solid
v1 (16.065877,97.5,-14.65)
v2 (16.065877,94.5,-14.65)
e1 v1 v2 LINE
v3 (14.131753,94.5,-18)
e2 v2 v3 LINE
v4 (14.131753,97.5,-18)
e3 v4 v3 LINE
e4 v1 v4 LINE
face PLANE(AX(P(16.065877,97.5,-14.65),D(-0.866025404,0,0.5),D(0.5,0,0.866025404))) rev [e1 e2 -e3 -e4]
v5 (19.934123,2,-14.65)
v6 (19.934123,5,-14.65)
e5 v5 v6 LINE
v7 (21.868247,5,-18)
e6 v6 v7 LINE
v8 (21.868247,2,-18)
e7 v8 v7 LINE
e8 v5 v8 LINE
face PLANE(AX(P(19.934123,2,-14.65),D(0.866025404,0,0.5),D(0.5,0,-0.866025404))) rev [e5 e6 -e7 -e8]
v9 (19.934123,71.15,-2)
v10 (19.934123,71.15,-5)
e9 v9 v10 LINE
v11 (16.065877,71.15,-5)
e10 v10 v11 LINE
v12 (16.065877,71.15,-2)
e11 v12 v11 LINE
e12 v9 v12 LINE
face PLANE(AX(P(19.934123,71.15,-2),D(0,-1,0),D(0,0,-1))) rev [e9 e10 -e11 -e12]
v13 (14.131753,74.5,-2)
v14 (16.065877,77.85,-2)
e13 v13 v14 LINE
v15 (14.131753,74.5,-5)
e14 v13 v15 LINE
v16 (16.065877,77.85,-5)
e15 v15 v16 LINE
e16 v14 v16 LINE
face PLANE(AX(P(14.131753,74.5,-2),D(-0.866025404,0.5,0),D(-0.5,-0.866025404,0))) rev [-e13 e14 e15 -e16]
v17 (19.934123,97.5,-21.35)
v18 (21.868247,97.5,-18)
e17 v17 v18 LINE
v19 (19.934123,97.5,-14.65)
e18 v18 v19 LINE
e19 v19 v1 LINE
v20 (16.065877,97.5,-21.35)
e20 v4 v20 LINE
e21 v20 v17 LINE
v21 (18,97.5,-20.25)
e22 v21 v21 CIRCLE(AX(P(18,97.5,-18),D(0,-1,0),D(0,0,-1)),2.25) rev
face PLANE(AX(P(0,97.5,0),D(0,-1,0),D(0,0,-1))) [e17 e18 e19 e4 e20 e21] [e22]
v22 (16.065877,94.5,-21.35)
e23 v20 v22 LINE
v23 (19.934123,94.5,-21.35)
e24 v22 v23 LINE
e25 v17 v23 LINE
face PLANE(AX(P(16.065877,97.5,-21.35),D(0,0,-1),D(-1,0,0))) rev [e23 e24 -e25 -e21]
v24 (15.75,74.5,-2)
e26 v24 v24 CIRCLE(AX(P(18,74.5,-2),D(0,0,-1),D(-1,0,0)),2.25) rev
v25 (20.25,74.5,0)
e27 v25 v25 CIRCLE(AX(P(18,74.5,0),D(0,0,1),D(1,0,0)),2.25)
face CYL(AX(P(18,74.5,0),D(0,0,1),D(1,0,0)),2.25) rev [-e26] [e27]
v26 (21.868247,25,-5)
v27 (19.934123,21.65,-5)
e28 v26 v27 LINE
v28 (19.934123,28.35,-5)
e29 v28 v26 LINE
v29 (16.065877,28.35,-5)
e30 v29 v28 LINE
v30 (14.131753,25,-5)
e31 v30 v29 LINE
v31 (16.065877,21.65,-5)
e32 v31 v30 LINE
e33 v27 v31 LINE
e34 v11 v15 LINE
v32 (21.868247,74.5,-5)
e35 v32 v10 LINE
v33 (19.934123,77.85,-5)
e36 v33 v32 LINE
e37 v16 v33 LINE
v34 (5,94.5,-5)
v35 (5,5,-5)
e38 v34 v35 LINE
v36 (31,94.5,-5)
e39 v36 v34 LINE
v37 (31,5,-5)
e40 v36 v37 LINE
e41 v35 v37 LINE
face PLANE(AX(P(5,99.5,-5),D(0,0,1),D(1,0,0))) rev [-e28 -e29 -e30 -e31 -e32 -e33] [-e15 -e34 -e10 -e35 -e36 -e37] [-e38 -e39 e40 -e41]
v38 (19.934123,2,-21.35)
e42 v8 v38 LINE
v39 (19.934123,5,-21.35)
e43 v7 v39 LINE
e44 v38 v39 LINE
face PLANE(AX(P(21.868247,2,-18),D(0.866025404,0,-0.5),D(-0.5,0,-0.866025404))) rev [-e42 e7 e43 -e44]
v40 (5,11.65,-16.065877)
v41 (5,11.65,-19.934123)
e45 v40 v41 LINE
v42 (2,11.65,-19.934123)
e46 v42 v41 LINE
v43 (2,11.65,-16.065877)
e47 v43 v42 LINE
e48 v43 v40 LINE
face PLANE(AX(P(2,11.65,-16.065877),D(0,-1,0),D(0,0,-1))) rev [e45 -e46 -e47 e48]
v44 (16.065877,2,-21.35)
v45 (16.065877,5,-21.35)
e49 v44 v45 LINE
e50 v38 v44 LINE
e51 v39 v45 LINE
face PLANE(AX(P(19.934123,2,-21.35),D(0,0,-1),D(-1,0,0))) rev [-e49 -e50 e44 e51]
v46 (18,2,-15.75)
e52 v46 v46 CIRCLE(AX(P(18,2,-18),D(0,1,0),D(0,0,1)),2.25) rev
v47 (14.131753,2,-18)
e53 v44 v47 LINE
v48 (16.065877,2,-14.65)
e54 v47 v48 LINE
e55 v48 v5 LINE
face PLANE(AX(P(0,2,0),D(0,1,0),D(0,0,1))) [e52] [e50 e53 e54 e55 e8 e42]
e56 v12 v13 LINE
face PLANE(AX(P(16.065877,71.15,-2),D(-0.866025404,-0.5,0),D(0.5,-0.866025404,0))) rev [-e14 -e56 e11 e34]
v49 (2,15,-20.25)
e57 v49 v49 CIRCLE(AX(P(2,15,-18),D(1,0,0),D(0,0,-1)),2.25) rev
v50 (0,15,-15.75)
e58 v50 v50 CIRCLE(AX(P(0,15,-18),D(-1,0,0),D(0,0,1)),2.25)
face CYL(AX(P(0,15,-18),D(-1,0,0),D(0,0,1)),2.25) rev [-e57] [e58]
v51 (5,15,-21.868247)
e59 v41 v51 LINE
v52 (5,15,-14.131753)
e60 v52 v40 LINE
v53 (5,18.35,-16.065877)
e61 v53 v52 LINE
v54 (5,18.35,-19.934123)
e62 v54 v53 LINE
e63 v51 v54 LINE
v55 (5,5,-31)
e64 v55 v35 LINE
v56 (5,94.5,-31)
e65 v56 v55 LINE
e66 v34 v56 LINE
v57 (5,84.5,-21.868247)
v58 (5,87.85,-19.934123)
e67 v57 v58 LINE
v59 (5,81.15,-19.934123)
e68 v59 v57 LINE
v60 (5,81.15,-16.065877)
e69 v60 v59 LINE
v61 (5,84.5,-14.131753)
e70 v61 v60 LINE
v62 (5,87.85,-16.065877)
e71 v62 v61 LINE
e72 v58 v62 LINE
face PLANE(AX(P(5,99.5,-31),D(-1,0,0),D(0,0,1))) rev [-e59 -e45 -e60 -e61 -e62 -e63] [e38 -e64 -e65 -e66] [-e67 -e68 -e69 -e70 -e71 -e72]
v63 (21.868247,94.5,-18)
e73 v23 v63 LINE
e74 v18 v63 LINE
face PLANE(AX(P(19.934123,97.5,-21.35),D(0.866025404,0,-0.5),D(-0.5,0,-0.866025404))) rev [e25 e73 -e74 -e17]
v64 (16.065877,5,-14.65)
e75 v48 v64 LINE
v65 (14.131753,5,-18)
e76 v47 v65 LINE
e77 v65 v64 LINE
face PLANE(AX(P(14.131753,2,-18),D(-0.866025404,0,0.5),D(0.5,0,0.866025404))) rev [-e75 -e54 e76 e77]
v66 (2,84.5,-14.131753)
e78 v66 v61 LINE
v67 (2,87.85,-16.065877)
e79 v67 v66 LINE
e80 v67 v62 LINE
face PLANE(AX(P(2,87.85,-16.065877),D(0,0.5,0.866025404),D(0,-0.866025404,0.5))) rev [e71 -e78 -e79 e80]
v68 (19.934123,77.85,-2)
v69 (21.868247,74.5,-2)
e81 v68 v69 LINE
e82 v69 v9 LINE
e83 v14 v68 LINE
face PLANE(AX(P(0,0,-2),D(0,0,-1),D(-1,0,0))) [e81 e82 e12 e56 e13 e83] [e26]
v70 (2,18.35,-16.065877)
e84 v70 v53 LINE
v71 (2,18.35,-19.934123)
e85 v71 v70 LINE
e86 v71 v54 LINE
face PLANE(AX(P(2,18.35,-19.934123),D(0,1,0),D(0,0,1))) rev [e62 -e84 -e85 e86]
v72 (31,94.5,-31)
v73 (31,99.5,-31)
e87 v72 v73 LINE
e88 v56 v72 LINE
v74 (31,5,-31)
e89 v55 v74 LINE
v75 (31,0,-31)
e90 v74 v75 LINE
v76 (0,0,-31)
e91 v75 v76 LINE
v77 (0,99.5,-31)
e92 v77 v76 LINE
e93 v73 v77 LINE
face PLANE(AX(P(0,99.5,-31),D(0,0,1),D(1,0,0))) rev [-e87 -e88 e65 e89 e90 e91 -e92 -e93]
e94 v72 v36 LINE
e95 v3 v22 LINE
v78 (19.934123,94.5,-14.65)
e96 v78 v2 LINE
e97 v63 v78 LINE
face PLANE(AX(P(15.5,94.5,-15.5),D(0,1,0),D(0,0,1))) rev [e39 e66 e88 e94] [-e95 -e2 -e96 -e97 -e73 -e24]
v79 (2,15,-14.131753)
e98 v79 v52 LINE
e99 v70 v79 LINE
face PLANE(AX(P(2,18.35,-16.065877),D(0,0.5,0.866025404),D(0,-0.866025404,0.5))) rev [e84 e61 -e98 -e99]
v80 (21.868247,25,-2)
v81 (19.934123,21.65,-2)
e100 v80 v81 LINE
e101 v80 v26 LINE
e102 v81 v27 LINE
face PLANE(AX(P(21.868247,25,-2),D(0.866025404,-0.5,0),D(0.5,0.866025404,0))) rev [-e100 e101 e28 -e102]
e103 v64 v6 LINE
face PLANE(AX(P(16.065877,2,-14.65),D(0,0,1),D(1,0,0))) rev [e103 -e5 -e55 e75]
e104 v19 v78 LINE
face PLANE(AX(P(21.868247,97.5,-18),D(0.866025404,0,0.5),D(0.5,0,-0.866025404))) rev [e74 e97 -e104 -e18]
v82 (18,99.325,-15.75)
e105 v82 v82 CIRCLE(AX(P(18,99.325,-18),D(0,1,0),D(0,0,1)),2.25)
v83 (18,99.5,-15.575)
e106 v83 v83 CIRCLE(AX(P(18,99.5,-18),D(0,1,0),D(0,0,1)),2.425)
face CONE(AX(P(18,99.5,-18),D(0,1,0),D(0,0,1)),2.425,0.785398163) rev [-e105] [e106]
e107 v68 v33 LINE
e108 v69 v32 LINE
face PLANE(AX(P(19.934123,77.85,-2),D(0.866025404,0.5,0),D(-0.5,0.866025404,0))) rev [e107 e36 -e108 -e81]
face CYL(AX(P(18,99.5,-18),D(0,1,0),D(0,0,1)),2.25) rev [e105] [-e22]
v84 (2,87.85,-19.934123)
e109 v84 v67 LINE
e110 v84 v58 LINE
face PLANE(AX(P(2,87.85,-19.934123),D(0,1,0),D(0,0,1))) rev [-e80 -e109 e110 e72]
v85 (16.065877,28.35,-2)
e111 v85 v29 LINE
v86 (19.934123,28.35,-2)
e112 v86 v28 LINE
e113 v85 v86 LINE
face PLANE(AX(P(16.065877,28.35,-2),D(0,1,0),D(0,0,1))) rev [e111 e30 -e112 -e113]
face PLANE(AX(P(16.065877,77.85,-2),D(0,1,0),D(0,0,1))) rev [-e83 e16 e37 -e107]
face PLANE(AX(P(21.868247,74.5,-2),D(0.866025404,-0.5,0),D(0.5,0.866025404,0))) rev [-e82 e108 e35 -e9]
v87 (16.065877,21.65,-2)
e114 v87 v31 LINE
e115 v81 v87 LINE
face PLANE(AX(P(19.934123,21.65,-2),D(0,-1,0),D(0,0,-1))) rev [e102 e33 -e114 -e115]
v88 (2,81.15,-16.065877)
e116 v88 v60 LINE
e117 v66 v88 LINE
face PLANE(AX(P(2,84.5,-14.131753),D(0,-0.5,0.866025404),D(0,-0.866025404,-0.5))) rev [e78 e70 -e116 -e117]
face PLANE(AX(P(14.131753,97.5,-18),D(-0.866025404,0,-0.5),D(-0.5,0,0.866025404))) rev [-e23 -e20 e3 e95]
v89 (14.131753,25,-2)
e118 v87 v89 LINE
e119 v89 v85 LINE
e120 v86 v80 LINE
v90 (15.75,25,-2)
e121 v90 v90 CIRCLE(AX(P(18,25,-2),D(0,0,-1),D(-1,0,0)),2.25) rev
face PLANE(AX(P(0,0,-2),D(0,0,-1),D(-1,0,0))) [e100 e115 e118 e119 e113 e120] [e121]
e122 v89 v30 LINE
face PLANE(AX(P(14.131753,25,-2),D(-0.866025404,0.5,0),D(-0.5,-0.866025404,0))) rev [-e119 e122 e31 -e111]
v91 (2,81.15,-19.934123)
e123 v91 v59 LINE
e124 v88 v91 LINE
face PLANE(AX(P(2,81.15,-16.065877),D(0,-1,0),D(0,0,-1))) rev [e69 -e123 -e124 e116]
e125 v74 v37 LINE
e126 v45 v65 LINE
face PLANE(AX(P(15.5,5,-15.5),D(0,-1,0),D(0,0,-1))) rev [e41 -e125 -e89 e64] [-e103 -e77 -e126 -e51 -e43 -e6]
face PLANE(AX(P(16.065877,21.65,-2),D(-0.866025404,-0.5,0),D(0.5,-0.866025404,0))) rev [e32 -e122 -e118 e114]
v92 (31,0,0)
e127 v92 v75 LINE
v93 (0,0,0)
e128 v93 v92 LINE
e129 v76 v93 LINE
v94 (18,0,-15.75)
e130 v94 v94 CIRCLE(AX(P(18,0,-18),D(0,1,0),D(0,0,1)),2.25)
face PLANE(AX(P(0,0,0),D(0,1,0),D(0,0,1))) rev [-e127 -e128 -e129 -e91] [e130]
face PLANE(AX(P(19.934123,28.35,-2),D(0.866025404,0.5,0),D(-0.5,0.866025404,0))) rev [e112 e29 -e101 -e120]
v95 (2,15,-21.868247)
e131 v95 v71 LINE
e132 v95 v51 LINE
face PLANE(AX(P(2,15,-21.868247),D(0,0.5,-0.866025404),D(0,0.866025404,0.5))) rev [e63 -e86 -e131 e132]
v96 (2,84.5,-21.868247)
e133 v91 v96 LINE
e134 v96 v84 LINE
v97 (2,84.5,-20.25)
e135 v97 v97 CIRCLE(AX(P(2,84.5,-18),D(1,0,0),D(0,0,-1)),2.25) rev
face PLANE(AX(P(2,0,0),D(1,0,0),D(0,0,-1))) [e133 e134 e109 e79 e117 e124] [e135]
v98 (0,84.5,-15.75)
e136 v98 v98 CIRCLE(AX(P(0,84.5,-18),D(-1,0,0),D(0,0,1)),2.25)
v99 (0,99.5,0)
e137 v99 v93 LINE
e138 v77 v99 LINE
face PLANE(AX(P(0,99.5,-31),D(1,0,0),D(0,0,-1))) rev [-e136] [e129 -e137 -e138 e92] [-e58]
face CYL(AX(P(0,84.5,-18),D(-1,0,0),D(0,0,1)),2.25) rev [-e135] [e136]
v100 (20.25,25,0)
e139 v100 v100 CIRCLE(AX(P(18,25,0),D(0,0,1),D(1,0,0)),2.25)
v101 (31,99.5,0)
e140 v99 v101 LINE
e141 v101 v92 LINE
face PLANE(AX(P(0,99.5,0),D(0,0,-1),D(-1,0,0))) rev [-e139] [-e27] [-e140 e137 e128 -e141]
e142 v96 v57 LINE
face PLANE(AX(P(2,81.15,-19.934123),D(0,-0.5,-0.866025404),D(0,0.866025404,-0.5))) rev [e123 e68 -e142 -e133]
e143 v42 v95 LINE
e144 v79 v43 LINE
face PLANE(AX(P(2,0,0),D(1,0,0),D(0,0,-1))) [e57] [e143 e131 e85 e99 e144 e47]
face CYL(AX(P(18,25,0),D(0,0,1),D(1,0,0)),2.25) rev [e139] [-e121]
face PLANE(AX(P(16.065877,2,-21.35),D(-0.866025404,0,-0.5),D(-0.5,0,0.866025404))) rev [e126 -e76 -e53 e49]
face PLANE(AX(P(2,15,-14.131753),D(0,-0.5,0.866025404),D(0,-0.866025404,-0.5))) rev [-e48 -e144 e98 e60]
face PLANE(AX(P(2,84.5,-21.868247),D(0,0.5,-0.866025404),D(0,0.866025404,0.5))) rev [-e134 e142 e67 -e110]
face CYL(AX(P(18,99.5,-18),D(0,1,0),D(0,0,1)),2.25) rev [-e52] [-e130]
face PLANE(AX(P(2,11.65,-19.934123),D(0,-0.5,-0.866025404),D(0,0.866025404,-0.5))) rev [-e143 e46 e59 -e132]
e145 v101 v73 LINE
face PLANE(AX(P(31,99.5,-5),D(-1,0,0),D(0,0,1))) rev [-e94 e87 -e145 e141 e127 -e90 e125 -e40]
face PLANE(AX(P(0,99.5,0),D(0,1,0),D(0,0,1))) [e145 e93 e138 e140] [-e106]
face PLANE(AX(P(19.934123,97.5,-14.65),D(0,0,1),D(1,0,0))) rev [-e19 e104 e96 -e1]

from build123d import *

# Parameters (mm, degrees)
RESSALTO_EXTRUS_O1_DEPTH          = 99.5
FURO_COM_FOLGA_DE_M43_D           = 4.5
FURO_COM_FOLGA_DE_M43_ON_FACE_2_D = 4.5
NERVURA4_START                    = -5
NERVURA4_OUTLINE_W                = 26
NERVURA4_OUTLINE_H                = 26
NERVURA4_DEPTH                    = 5
CORTE_EXTRUS_O3_DEPTH             = 3
CORTE_EXTRUS_O4_DEPTH             = 3
FURO_COM_FOLGA_DE_M42_D           = 4.5
FURO_COM_FOLGA_DE_M42_CSINK_D     = 4.85
FURO_COM_FOLGA_DE_M42_CSINK_ANGLE = 90
CORTE_EXTRUS_O5_DEPTH             = 3
CORTE_EXTRUS_O6_DEPTH             = 3


# Read off the part's stored shape, not the designer's step: Nervura4
with BuildPart() as part:
    # Esboço1 → Ressalto-extrusão1 (new body)
    with BuildSketch(Plane(origin=(0, 0, 0), x_dir=(1, 0, 0), z_dir=(0, 1, 0))):
        Polygon((0, 0), (31, 0), (31, 5), (5, 5), (5, 31), (0, 31), align=None)
    extrude(amount=RESSALTO_EXTRUS_O1_DEPTH)

    # Furo com folga de M43 (through all)
    with Locations(Plane(origin=(0, 84.5, -18), x_dir=(0, 0, -1), z_dir=(-1, 0, 0))):
        with Locations((0, 0), (0, 69.5)):
            Hole(FURO_COM_FOLGA_DE_M43_D / 2)

    # Furo com folga de M43 on face 2 (through all)
    with Locations(Plane(origin=(18, 74.5, 0), x_dir=(1, 0, 0), z_dir=(0, 0, 1))):
        with Locations((0, 0), (0, -49.5)):
            Hole(FURO_COM_FOLGA_DE_M43_ON_FACE_2_D / 2)

    # Nervura4 outline → Nervura4 (add)
    with BuildSketch(Plane(origin=(0, 99.5, 0), x_dir=(1, 0, 0), z_dir=(0, 1, 0)).offset(NERVURA4_START)):
        with Locations((18, 18)):
            Rectangle(NERVURA4_OUTLINE_W, NERVURA4_OUTLINE_H)
    nervura4 = extrude(amount=NERVURA4_DEPTH)

    # Esboço17 → Corte-extrusão3 (cut)
    with BuildSketch(Plane(origin=(0, 0, -5), x_dir=(-1, 0, 0), z_dir=(0, 0, -1))):
        Polygon((-16.065876598, 77.85), (-19.934123402, 77.85), (-21.868246804, 74.5), (-19.934123402, 71.15), (-16.065876598, 71.15), (-14.131753196, 74.5), align=None)
        Polygon((-14.131753196, 25), (-16.065876598, 28.35), (-19.934123402, 28.35), (-21.868246804, 25), (-19.934123402, 21.65), (-16.065876598, 21.65), align=None)
    extrude(amount=-CORTE_EXTRUS_O3_DEPTH, mode=Mode.SUBTRACT)

    # Esboço18 → Corte-extrusão4 (cut)
    with BuildSketch(Plane(origin=(5, 0, 0), x_dir=(0, 0, -1), z_dir=(1, 0, 0))):
        Polygon((19.934123402, 87.85), (16.065876598, 87.85), (14.131753196, 84.5), (16.065876598, 81.15), (19.934123402, 81.15), (21.868246804, 84.5), align=None)
        Polygon((21.868246804, 15), (19.934123402, 18.35), (16.065876598, 18.35), (14.131753196, 15), (16.065876598, 11.65), (19.934123402, 11.65), align=None)
    extrude(amount=-CORTE_EXTRUS_O4_DEPTH, mode=Mode.SUBTRACT)

    # Espelhar1: Nervura4 across plane
    add(nervura4.mirror(Plane(origin=(0, 49.75, 0), x_dir=(0, 0, 1), z_dir=(0, -1, 0))))

    # Furo com folga de M42 (through all)
    with Locations(Plane(origin=(0, 99.5, 0), x_dir=(1, 0, 0), z_dir=(0, 1, 0))):
        with Locations((18, 18)):
            CounterSinkHole(FURO_COM_FOLGA_DE_M42_D / 2, FURO_COM_FOLGA_DE_M42_CSINK_D / 2, counter_sink_angle=FURO_COM_FOLGA_DE_M42_CSINK_ANGLE)

    # Esboço27 → Corte-extrusão5 (cut)
    with BuildSketch(Plane.XZ.offset(-94.5)):
        Polygon((21.868246804, -18), (19.934123402, -14.65), (16.065876598, -14.65), (14.131753196, -18), (16.065876598, -21.35), (19.934123402, -21.35), align=None)
    extrude(amount=-CORTE_EXTRUS_O5_DEPTH, mode=Mode.SUBTRACT)

    # Esboço28 → Corte-extrusão6 (cut)
    with BuildSketch(Plane(origin=(0, 5, 0), x_dir=(1, 0, 0), z_dir=(0, 1, 0))):
        Polygon((19.934123402, 21.35), (16.065876598, 21.35), (14.131753196, 18), (16.065876598, 14.65), (19.934123402, 14.65), (21.868246804, 18), align=None)
    extrude(amount=-CORTE_EXTRUS_O6_DEPTH, mode=Mode.SUBTRACT)


solid = part.part
